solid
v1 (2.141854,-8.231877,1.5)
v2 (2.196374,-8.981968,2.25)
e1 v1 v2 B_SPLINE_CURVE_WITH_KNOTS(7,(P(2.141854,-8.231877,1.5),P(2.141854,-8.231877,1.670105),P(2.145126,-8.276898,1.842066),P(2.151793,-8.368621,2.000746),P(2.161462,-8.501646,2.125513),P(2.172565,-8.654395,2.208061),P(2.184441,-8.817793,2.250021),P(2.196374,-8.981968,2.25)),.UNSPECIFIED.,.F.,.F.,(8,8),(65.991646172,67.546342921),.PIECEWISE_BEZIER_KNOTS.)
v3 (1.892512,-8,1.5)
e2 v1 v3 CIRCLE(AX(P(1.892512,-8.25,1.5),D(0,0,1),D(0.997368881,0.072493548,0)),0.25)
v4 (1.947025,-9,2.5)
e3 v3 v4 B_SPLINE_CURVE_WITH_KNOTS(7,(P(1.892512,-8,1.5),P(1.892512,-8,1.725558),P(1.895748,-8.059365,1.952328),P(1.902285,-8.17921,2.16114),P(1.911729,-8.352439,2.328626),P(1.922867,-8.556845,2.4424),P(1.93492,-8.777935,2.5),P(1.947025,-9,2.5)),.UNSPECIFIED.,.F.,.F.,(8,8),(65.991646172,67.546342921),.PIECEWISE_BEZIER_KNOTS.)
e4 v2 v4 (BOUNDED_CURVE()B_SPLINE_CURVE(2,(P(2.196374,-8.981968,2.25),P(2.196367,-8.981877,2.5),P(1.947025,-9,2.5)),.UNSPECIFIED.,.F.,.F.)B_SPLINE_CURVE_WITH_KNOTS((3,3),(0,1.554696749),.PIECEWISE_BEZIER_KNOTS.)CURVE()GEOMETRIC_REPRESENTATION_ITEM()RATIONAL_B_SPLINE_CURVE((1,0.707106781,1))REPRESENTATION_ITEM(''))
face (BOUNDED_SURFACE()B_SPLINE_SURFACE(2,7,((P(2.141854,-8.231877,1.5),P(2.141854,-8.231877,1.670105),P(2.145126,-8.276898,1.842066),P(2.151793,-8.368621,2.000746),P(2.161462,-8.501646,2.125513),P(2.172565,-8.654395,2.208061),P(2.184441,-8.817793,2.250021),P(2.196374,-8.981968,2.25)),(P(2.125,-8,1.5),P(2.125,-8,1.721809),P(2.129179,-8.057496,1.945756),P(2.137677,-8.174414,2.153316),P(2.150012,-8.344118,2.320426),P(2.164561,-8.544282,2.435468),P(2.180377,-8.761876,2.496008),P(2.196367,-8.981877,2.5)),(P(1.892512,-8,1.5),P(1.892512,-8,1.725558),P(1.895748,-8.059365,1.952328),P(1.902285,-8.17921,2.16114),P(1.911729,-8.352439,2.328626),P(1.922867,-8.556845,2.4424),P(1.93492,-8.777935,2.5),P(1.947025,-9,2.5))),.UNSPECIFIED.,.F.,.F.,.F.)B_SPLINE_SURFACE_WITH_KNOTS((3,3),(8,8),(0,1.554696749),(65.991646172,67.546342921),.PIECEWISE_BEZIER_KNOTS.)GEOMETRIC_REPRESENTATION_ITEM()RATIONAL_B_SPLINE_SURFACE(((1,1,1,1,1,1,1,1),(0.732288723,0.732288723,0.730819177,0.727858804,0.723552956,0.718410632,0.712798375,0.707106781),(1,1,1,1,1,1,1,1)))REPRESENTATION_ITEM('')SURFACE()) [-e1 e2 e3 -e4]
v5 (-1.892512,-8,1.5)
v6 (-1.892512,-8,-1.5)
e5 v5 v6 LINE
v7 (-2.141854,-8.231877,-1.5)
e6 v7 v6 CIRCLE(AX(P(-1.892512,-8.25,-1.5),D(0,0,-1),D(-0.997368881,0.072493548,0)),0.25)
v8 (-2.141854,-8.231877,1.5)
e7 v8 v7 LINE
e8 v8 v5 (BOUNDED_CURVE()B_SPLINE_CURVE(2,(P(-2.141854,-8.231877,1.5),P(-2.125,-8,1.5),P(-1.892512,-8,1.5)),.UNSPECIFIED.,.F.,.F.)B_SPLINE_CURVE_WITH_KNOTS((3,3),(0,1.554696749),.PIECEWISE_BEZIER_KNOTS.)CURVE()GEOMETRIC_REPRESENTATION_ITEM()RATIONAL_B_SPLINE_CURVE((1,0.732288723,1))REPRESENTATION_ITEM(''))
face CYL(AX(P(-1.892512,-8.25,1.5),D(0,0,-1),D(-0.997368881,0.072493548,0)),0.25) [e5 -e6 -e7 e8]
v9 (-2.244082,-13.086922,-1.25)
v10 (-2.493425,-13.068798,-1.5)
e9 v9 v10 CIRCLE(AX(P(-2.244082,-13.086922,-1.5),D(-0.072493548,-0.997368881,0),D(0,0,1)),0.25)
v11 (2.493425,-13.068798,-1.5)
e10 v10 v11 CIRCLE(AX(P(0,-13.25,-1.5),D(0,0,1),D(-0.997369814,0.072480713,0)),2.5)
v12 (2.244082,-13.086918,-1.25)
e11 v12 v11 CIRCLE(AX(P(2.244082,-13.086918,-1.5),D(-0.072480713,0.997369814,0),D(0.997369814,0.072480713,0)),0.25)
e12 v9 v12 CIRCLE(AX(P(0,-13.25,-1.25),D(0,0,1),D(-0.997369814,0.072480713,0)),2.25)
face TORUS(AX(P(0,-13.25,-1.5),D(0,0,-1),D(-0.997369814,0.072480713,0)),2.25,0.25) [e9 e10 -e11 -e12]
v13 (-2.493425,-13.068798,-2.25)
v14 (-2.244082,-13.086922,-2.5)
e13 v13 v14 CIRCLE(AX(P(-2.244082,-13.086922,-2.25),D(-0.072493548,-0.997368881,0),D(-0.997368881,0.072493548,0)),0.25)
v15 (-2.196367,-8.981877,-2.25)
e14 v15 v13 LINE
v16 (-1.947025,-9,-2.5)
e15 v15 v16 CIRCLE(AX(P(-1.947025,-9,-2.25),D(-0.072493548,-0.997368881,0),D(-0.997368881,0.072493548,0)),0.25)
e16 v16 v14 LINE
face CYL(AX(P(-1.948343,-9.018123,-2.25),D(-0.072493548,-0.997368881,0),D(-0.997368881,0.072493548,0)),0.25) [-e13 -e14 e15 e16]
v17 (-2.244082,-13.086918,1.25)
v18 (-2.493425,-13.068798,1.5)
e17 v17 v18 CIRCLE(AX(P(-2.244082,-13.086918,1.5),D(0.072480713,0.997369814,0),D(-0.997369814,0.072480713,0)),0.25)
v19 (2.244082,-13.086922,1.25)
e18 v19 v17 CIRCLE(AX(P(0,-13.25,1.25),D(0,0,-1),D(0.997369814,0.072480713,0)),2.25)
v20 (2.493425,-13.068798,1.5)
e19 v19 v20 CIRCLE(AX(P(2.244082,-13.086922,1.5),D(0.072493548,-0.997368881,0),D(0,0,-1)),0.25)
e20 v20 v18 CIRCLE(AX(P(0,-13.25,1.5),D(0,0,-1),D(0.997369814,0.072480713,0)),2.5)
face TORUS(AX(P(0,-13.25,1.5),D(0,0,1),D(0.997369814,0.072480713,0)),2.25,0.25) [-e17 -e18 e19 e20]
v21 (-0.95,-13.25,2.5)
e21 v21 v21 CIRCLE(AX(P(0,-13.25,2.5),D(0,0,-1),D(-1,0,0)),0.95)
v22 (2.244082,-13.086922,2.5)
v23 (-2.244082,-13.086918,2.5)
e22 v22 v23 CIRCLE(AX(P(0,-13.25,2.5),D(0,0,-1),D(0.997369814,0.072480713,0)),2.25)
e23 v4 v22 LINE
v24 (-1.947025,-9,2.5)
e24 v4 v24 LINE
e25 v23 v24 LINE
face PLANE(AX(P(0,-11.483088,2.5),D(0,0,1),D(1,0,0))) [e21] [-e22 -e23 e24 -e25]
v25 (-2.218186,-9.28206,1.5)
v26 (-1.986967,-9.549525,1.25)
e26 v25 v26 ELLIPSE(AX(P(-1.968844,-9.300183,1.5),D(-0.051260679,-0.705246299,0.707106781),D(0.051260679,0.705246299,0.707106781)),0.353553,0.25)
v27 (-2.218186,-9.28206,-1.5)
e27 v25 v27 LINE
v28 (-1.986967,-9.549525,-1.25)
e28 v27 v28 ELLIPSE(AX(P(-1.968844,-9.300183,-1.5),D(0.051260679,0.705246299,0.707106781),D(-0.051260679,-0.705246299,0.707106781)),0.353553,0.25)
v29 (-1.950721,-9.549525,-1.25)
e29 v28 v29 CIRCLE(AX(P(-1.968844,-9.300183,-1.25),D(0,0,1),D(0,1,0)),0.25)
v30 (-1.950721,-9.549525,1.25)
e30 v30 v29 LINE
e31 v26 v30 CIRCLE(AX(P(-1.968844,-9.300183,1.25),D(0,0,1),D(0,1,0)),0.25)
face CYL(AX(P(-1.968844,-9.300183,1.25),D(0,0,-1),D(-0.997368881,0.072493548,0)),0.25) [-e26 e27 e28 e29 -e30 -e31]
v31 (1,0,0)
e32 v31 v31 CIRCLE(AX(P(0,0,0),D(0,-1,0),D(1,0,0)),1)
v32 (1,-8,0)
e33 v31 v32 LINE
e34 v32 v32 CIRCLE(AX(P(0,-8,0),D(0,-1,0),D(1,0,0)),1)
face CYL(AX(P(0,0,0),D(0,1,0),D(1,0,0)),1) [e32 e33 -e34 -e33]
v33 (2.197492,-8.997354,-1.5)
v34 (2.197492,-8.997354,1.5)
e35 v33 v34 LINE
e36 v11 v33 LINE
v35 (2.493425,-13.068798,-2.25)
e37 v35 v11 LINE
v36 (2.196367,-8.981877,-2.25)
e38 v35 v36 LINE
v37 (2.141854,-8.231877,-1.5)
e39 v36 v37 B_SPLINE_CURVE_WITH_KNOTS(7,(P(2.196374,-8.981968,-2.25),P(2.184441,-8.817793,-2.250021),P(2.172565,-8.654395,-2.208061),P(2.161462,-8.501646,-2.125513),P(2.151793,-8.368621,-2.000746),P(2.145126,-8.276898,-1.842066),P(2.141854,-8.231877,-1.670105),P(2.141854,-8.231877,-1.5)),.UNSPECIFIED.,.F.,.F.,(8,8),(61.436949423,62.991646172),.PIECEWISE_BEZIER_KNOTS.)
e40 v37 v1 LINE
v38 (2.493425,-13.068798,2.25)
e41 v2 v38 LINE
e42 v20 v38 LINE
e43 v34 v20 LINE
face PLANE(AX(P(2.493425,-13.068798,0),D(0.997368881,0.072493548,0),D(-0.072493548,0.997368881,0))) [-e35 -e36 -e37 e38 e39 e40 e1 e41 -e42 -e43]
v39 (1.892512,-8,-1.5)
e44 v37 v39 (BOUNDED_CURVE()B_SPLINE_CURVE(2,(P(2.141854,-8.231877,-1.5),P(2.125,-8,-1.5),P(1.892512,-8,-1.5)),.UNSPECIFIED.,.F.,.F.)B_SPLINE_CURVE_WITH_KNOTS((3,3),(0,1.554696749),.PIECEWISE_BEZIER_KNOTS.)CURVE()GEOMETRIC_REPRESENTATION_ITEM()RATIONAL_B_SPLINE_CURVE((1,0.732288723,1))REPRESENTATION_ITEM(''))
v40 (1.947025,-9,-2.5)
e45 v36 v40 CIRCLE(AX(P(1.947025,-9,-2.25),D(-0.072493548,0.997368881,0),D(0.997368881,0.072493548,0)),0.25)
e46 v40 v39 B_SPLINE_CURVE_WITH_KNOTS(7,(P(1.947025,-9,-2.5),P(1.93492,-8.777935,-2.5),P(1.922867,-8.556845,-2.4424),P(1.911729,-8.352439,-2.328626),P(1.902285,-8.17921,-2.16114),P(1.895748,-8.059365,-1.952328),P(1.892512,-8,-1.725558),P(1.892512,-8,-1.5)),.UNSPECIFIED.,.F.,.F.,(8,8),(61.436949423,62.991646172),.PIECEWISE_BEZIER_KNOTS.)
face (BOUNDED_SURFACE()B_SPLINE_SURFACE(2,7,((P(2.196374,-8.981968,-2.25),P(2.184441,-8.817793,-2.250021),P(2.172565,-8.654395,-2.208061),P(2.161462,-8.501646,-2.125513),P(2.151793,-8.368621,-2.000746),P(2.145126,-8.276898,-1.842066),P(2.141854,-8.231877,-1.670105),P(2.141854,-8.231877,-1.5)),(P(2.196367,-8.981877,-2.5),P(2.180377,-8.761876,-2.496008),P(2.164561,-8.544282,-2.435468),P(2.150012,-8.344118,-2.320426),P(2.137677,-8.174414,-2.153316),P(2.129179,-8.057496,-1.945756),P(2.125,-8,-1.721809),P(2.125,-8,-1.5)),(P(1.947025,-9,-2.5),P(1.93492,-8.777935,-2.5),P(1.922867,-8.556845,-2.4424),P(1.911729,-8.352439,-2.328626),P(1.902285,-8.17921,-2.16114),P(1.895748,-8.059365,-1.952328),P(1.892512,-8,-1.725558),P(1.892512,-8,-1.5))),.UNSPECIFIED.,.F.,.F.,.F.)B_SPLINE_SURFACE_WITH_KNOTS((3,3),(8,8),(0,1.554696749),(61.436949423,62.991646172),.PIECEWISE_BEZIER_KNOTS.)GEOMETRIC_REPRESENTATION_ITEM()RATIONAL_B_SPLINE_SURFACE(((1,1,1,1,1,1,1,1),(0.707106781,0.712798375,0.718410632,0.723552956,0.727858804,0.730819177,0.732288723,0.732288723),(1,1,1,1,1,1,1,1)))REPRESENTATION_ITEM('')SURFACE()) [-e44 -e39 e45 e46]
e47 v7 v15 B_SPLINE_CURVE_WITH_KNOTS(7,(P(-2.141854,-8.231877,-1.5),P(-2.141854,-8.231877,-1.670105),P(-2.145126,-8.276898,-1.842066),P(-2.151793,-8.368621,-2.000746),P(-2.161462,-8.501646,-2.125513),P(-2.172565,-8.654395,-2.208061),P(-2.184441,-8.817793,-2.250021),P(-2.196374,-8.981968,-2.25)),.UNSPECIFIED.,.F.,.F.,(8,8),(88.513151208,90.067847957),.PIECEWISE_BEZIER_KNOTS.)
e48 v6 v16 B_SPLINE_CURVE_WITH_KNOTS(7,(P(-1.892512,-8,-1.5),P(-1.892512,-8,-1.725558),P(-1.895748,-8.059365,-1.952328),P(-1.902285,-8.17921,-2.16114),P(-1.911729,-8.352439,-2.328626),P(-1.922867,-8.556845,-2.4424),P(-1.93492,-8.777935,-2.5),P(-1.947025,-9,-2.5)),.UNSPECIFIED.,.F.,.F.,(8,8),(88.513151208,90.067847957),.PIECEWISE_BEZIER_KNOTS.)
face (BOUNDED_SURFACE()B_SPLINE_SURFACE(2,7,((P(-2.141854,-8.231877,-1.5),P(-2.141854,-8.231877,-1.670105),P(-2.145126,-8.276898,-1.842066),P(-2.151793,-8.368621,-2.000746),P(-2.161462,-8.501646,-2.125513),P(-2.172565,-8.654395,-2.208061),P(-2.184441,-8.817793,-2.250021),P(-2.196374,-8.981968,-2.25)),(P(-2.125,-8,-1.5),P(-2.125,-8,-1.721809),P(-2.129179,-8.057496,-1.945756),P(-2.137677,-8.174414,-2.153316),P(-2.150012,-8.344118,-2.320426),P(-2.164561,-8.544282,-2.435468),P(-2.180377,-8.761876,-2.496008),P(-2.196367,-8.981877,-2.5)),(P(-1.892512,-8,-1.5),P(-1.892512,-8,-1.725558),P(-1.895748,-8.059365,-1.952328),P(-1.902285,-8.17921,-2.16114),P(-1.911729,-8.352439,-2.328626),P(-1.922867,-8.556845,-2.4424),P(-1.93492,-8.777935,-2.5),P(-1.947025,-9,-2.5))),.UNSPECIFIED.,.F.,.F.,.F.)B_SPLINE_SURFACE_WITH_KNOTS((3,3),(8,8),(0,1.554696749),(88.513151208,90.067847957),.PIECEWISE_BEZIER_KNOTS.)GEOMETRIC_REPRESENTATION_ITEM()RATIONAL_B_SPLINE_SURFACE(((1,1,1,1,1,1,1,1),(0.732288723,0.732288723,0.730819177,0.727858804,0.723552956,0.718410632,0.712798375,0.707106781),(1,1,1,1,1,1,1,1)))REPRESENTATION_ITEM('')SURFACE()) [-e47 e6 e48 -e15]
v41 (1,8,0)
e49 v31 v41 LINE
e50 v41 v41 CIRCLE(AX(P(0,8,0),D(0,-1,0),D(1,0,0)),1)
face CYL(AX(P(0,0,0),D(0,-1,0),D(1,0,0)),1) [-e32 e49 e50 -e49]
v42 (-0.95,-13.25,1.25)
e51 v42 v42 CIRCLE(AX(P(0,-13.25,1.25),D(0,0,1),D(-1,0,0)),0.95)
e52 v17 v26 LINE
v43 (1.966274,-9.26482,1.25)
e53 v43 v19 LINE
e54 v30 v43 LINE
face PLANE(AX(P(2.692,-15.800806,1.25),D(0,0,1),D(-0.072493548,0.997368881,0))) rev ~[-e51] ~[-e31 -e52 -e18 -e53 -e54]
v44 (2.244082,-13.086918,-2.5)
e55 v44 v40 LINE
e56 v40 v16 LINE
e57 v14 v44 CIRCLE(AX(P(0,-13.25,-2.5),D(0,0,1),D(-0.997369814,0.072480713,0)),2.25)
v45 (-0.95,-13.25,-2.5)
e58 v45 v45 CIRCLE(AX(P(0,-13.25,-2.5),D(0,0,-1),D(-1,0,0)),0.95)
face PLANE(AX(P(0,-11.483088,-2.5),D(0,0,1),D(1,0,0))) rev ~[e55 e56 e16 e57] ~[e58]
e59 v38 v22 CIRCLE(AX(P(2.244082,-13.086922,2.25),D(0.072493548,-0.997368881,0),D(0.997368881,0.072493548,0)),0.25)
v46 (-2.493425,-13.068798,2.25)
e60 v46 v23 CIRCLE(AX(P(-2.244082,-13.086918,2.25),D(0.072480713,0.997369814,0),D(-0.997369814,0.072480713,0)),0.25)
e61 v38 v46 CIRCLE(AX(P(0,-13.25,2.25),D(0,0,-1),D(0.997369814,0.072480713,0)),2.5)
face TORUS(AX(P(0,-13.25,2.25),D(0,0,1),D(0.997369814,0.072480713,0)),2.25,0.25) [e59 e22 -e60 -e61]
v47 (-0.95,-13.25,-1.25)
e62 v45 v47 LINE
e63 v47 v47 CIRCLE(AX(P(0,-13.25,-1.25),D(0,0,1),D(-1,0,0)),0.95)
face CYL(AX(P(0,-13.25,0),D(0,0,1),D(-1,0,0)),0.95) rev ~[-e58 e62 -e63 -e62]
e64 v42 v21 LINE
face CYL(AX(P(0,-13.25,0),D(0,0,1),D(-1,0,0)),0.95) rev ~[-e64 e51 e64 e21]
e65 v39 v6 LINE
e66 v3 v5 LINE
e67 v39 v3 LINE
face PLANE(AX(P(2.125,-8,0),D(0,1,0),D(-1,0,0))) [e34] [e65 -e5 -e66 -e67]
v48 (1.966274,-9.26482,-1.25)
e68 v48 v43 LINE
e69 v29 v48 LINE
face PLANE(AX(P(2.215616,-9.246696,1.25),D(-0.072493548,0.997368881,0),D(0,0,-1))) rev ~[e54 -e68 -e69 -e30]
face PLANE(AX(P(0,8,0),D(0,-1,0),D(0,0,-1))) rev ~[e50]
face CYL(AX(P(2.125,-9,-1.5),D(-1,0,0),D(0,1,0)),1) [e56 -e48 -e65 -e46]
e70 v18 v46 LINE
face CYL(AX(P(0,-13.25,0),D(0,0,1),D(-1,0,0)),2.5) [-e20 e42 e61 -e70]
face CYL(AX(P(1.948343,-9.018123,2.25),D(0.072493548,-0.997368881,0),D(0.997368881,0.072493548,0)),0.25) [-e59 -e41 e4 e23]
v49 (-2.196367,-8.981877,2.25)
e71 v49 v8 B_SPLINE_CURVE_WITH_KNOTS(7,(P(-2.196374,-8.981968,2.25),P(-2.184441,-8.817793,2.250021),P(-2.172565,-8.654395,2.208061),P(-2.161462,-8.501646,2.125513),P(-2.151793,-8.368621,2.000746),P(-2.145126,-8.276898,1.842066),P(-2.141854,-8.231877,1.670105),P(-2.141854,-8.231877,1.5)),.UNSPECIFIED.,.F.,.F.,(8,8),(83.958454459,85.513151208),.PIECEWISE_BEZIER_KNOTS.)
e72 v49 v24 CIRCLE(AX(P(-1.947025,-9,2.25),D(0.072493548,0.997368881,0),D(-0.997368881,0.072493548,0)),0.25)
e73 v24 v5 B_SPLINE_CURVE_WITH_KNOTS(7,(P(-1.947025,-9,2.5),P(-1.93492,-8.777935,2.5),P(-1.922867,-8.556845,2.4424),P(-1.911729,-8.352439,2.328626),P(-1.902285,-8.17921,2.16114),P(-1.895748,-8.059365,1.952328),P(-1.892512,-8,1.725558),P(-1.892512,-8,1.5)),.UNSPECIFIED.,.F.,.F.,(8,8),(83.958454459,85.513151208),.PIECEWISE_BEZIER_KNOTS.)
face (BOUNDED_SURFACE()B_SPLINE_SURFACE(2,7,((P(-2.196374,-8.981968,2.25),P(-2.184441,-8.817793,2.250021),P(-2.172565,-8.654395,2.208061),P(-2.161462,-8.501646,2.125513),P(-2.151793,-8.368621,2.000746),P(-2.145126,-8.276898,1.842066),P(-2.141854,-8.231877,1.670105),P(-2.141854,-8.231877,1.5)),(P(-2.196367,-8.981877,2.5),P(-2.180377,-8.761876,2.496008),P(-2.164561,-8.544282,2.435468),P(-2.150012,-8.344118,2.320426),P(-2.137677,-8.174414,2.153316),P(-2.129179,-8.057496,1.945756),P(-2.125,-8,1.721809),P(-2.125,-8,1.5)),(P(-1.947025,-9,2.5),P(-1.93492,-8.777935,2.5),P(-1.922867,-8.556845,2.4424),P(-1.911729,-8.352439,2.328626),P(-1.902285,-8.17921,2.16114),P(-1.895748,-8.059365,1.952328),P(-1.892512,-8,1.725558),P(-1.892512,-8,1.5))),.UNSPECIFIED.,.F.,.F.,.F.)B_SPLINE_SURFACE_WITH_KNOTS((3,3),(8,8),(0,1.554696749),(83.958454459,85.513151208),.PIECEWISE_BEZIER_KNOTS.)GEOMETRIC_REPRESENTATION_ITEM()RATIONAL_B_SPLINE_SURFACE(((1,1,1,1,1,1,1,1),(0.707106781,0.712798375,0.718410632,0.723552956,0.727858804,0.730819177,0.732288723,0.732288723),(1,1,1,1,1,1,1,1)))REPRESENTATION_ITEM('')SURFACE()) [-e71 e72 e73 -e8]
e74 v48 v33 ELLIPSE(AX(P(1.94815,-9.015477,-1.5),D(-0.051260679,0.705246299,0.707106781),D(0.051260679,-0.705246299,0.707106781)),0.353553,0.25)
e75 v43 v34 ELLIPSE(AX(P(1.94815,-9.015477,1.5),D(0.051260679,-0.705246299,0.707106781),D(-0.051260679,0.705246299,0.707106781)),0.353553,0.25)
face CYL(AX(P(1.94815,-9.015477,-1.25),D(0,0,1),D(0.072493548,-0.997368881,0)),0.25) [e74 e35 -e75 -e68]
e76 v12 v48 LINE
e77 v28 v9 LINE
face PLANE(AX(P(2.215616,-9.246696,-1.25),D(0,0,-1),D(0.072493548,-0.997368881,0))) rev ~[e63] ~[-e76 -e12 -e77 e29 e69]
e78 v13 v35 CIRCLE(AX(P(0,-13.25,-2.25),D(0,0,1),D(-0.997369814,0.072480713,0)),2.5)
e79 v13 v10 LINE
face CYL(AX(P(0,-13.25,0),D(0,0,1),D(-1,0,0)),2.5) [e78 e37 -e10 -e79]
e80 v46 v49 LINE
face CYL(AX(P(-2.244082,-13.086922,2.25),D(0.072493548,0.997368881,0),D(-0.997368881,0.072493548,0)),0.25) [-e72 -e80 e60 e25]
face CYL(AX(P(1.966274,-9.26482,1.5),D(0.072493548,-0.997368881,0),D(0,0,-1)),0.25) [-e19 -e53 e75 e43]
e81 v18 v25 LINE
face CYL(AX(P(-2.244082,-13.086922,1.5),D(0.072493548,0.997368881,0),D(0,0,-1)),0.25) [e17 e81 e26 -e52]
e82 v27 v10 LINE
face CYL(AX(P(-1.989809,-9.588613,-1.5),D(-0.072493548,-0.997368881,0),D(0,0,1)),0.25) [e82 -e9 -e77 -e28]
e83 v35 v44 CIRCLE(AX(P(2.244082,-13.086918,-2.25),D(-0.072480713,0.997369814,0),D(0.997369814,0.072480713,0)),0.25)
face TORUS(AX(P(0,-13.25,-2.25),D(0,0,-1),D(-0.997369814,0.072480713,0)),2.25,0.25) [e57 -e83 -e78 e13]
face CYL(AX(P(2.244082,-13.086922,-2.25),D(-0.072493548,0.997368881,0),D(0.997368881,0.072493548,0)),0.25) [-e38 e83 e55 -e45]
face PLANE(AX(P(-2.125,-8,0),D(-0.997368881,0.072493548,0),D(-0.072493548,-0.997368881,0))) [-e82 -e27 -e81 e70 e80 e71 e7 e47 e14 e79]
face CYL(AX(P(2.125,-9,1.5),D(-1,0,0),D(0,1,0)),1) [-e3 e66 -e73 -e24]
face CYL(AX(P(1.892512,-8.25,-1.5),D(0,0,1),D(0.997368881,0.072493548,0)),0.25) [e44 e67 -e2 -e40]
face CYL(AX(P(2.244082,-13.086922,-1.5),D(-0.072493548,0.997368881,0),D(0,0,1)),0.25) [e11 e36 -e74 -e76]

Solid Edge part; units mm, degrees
sketch "Sketch1" plane through (0, 0, 0) normal (0, -1, 0) x (1, 0, 0)
  circle A0 centre (0, 0) radius 1
extrude "Protrusion1" add sketch "Sketch1" along normal mid plane 16
sketch "Sketch2" plane through (0, -8, 0) normal (0, 0, -1) x (-1, 0, 0)
  circle A0 centre (0, -5.25) radius 0.95
  line L0 (2.125, 0) -> (2.4934, -5.0688)
  arc A1 (2.4934, -5.0688) -> (-2.4934, -5.0688) centre (0, -5.25) cw
  line L1 (-2.4934, -5.0688) -> (-2.125, 0)
  line L2 (-2.125, 0) -> (2.125, 0)
extrude "ExtrudedProtrusion_2" add sketch "Sketch2" along normal mid plane 5
sketch "Sketch3" plane through (2.3092, -10.5344, 0) normal (0.9973689, 0.0724935, 0) x (-0.0724935, 0.9973689, 0)
  line L0 (1.2911, -1.25) -> (-5.2803, -1.25)
  line L1 (-5.2803, -1.25) -> (-5.2803, 1.25)
  line L2 (-5.2803, 1.25) -> (1.2911, 1.25)
  line L3 (1.2911, 1.25) -> (1.2911, -1.25)
extrude "Cutout1" cut sketch "Sketch3" along normal through all and the other way through all
fillet "Round_1" radius 1 2 edges at (0, -8, -2.5) (0, -8, 2.5)
fillet "Round_1" radius 0.25 15 edges at (-2.3092, -10.5344, -2.5) (0, -15.75, -2.5) (2.3092, -10.5344, -2.5) (-2.125, -8, 0) (-2.3092, -10.5344, 2.5) (0, -15.75, 2.5) (2.3092, -10.5344, 2.5) (2.125, -8, 0) (2.2156, -9.2467, 0) (2.3545, -11.1577, -1.25) (-2.3663, -11.3196, -1.25) (2.3545, -11.1577, 1.25) (0, -15.75, 1.25) (-2.3663, -11.3196, 1.25) (-2.2392, -9.5705, 0)
properties material "Steel"
